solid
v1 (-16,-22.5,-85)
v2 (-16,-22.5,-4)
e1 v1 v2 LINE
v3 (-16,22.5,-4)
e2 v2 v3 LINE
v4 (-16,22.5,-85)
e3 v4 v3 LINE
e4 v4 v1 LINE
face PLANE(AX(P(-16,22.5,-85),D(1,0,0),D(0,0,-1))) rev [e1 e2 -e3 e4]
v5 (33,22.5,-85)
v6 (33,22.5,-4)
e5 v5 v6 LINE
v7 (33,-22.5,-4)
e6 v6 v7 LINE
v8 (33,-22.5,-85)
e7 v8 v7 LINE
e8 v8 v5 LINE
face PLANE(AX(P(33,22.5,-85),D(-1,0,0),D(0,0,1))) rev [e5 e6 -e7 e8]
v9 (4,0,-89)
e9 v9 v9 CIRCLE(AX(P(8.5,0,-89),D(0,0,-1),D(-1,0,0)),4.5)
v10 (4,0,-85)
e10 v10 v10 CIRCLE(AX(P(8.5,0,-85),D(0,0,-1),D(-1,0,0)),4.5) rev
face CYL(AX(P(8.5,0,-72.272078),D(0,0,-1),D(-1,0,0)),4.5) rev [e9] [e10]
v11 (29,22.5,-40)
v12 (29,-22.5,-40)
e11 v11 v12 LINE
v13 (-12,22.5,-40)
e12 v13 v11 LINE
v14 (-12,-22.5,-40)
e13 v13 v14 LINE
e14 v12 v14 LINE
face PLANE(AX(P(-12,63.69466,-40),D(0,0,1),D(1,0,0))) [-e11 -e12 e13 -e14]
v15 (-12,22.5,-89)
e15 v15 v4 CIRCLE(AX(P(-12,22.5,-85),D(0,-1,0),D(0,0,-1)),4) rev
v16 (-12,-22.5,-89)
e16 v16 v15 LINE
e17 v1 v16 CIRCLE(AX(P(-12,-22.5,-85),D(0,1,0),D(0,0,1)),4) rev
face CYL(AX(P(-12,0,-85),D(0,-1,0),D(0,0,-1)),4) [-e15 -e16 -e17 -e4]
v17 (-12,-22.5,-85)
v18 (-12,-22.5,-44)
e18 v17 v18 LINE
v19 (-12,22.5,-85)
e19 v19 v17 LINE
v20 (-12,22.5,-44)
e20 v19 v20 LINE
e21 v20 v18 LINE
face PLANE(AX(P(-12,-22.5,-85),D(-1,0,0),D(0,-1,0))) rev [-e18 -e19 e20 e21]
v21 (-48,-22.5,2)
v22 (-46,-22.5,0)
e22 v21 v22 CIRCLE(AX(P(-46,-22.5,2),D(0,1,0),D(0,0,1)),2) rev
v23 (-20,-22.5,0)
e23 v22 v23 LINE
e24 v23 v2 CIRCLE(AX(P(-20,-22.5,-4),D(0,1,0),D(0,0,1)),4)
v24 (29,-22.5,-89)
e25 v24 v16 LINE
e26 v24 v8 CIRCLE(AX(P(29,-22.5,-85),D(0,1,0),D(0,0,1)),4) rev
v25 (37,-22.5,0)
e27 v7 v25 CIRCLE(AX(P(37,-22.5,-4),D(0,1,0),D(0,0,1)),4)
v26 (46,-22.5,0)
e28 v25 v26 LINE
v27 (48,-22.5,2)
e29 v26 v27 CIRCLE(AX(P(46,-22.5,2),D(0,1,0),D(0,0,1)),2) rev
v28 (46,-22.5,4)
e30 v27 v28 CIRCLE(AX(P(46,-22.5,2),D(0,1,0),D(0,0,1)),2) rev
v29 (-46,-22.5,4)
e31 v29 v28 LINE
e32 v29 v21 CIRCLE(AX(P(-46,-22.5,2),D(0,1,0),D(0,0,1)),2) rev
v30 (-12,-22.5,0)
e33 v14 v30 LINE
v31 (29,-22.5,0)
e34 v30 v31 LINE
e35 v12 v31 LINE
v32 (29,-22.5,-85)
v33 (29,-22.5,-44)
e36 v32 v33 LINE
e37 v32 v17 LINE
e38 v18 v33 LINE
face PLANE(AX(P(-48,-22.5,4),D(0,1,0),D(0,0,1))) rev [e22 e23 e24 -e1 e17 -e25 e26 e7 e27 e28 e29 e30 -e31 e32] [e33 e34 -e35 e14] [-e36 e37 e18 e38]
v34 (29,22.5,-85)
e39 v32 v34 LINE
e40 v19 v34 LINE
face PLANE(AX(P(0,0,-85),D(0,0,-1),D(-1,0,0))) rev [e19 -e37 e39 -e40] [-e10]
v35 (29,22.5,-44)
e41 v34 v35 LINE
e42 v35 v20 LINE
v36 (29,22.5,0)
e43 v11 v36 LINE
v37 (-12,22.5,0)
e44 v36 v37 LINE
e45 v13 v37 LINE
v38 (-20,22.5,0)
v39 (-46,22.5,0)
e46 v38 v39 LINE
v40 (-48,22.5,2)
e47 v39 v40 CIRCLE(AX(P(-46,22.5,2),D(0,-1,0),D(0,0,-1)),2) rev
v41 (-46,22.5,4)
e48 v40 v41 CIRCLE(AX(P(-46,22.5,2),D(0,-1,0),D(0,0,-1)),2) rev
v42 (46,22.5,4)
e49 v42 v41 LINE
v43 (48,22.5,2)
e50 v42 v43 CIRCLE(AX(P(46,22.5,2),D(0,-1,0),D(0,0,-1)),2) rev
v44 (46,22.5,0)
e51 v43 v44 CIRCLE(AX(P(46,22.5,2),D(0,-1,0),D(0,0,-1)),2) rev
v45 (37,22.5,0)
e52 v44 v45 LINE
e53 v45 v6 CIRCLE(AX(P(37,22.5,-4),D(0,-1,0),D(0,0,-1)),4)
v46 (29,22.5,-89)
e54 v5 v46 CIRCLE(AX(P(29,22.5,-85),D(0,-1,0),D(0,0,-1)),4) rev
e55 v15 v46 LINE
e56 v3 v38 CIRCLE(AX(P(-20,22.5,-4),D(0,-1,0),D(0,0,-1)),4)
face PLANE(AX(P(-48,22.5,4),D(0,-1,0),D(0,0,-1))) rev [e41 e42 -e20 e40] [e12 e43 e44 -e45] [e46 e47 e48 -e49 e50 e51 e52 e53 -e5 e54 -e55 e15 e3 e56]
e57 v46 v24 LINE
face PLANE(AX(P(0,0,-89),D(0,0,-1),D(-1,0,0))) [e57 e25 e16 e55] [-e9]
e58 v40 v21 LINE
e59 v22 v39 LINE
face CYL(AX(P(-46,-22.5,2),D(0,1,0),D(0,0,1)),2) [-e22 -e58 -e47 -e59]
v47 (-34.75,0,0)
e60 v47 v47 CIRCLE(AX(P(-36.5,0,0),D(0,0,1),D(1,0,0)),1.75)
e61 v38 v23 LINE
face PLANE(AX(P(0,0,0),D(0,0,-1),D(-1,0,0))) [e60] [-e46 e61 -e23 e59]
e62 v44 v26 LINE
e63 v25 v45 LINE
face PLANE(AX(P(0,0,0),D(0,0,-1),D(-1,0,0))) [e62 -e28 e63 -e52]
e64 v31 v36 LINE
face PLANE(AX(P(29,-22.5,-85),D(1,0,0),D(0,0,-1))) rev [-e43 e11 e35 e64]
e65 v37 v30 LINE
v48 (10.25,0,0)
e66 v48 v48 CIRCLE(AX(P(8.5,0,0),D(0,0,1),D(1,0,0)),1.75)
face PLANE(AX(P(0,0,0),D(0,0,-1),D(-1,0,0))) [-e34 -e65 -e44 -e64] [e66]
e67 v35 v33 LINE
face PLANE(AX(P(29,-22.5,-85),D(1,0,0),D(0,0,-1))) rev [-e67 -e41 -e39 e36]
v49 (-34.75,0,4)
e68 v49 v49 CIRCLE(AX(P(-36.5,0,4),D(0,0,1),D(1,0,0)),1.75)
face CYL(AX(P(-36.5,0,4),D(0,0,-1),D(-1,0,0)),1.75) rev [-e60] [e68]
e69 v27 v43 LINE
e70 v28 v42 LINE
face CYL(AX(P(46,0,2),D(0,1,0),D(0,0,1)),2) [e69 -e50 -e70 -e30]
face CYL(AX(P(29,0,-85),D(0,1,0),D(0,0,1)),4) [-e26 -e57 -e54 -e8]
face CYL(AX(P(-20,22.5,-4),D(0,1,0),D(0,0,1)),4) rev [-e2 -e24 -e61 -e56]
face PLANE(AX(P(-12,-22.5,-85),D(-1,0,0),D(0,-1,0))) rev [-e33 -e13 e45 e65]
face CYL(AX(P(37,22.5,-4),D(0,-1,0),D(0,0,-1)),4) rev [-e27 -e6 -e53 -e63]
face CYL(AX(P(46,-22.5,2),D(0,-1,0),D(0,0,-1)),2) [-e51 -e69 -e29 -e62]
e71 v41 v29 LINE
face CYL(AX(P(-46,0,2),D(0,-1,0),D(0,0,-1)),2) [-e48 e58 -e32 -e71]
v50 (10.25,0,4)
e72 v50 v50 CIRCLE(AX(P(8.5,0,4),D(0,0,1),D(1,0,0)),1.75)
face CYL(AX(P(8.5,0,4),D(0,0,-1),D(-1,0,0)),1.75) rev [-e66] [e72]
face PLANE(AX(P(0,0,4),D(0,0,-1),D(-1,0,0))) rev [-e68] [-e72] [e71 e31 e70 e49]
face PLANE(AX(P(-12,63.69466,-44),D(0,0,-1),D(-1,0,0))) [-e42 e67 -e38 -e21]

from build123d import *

# Parameters (mm, degrees)
SKETCH_1_W          = 96
SKETCH_1_H          = 45
SKETCH_1_R          = 1.75
EXTRUDE_1_DEPTH     = 4
SKETCH_2_W          = 4
SKETCH_2_H          = 45
EXTRUDE_2_DEPTH     = 85
SKETCH_3_W          = 49
SKETCH_3_H          = 45
EXTRUDE_3_DEPTH     = 4
SKETCH_4_W          = 41
SKETCH_4_H          = 4
EXTRUDE_4_DEPTH     = 45
FILLET_1_R          = 4
SKETCH_5_R          = 4.5
CUT_EXTRUDE_1_DEPTH = 4
FILLET_2_R          = 2


with BuildPart() as part:
    # 草图1 → 凸台-拉伸1 (new body)
    with BuildSketch(Plane.XY):
        Rectangle(SKETCH_1_W, SKETCH_1_H)
        with Locations((8.5, 0)):
            Circle(SKETCH_1_R, mode=Mode.SUBTRACT)
        with Locations((-36.5, 0)):
            Circle(SKETCH_1_R, mode=Mode.SUBTRACT)
    extrude(amount=EXTRUDE_1_DEPTH)

    # 草图2 → 凸台-拉伸2 (add)
    with BuildSketch(Plane(origin=(0, 0, 0), x_dir=(-1, 0, 0), z_dir=(0, 0, -1))):
        with Locations((-31, 0)):
            Rectangle(SKETCH_2_W, SKETCH_2_H)
        with Locations((14, 0)):
            Rectangle(SKETCH_2_W, SKETCH_2_H)
    extrude(amount=EXTRUDE_2_DEPTH)

    # 草图3 → 凸台-拉伸3 (add)
    with BuildSketch(Plane(origin=(0, 0, -85), x_dir=(-1, 0, 0), z_dir=(0, 0, -1))):
        with Locations((-8.5, 0)):
            Rectangle(SKETCH_3_W, SKETCH_3_H)
    extrude(amount=EXTRUDE_3_DEPTH)

    # 草图4 → 凸台-拉伸4 (add)
    with BuildSketch(Plane.XZ.offset(22.5)):
        with Locations((8.5, -42)):
            Rectangle(SKETCH_4_W, SKETCH_4_H)
    extrude(amount=-EXTRUDE_4_DEPTH)

    # 圆角1
    fillet_1_edges = [part.edges().sort_by_distance(p)[0] for p in [
        (-16, 0, 0),
        (33, 0, 0),
        (33, 0, -89),
        (-16, 0, -89),
    ]]
    fillet(fillet_1_edges, radius=FILLET_1_R)

    # 草图5 → 切除-拉伸1 (cut)
    with BuildSketch(Plane(origin=(0, 0, -89), x_dir=(-1, 0, 0), z_dir=(0, 0, -1))):
        with Locations((-8.5, 0)):
            Circle(SKETCH_5_R)
    extrude(amount=-CUT_EXTRUDE_1_DEPTH, mode=Mode.SUBTRACT)

    # 圆角2
    fillet_2_edges = [part.edges().sort_by_distance(p)[0] for p in [
        (-48, 0, 4),
        (-48, 0, 0),
        (48, 0, 4),
        (48, 0, 0),
    ]]
    fillet(fillet_2_edges, radius=FILLET_2_R - 0.0001)  # a hair under: the kernel refuses the full size


solid = part.part
